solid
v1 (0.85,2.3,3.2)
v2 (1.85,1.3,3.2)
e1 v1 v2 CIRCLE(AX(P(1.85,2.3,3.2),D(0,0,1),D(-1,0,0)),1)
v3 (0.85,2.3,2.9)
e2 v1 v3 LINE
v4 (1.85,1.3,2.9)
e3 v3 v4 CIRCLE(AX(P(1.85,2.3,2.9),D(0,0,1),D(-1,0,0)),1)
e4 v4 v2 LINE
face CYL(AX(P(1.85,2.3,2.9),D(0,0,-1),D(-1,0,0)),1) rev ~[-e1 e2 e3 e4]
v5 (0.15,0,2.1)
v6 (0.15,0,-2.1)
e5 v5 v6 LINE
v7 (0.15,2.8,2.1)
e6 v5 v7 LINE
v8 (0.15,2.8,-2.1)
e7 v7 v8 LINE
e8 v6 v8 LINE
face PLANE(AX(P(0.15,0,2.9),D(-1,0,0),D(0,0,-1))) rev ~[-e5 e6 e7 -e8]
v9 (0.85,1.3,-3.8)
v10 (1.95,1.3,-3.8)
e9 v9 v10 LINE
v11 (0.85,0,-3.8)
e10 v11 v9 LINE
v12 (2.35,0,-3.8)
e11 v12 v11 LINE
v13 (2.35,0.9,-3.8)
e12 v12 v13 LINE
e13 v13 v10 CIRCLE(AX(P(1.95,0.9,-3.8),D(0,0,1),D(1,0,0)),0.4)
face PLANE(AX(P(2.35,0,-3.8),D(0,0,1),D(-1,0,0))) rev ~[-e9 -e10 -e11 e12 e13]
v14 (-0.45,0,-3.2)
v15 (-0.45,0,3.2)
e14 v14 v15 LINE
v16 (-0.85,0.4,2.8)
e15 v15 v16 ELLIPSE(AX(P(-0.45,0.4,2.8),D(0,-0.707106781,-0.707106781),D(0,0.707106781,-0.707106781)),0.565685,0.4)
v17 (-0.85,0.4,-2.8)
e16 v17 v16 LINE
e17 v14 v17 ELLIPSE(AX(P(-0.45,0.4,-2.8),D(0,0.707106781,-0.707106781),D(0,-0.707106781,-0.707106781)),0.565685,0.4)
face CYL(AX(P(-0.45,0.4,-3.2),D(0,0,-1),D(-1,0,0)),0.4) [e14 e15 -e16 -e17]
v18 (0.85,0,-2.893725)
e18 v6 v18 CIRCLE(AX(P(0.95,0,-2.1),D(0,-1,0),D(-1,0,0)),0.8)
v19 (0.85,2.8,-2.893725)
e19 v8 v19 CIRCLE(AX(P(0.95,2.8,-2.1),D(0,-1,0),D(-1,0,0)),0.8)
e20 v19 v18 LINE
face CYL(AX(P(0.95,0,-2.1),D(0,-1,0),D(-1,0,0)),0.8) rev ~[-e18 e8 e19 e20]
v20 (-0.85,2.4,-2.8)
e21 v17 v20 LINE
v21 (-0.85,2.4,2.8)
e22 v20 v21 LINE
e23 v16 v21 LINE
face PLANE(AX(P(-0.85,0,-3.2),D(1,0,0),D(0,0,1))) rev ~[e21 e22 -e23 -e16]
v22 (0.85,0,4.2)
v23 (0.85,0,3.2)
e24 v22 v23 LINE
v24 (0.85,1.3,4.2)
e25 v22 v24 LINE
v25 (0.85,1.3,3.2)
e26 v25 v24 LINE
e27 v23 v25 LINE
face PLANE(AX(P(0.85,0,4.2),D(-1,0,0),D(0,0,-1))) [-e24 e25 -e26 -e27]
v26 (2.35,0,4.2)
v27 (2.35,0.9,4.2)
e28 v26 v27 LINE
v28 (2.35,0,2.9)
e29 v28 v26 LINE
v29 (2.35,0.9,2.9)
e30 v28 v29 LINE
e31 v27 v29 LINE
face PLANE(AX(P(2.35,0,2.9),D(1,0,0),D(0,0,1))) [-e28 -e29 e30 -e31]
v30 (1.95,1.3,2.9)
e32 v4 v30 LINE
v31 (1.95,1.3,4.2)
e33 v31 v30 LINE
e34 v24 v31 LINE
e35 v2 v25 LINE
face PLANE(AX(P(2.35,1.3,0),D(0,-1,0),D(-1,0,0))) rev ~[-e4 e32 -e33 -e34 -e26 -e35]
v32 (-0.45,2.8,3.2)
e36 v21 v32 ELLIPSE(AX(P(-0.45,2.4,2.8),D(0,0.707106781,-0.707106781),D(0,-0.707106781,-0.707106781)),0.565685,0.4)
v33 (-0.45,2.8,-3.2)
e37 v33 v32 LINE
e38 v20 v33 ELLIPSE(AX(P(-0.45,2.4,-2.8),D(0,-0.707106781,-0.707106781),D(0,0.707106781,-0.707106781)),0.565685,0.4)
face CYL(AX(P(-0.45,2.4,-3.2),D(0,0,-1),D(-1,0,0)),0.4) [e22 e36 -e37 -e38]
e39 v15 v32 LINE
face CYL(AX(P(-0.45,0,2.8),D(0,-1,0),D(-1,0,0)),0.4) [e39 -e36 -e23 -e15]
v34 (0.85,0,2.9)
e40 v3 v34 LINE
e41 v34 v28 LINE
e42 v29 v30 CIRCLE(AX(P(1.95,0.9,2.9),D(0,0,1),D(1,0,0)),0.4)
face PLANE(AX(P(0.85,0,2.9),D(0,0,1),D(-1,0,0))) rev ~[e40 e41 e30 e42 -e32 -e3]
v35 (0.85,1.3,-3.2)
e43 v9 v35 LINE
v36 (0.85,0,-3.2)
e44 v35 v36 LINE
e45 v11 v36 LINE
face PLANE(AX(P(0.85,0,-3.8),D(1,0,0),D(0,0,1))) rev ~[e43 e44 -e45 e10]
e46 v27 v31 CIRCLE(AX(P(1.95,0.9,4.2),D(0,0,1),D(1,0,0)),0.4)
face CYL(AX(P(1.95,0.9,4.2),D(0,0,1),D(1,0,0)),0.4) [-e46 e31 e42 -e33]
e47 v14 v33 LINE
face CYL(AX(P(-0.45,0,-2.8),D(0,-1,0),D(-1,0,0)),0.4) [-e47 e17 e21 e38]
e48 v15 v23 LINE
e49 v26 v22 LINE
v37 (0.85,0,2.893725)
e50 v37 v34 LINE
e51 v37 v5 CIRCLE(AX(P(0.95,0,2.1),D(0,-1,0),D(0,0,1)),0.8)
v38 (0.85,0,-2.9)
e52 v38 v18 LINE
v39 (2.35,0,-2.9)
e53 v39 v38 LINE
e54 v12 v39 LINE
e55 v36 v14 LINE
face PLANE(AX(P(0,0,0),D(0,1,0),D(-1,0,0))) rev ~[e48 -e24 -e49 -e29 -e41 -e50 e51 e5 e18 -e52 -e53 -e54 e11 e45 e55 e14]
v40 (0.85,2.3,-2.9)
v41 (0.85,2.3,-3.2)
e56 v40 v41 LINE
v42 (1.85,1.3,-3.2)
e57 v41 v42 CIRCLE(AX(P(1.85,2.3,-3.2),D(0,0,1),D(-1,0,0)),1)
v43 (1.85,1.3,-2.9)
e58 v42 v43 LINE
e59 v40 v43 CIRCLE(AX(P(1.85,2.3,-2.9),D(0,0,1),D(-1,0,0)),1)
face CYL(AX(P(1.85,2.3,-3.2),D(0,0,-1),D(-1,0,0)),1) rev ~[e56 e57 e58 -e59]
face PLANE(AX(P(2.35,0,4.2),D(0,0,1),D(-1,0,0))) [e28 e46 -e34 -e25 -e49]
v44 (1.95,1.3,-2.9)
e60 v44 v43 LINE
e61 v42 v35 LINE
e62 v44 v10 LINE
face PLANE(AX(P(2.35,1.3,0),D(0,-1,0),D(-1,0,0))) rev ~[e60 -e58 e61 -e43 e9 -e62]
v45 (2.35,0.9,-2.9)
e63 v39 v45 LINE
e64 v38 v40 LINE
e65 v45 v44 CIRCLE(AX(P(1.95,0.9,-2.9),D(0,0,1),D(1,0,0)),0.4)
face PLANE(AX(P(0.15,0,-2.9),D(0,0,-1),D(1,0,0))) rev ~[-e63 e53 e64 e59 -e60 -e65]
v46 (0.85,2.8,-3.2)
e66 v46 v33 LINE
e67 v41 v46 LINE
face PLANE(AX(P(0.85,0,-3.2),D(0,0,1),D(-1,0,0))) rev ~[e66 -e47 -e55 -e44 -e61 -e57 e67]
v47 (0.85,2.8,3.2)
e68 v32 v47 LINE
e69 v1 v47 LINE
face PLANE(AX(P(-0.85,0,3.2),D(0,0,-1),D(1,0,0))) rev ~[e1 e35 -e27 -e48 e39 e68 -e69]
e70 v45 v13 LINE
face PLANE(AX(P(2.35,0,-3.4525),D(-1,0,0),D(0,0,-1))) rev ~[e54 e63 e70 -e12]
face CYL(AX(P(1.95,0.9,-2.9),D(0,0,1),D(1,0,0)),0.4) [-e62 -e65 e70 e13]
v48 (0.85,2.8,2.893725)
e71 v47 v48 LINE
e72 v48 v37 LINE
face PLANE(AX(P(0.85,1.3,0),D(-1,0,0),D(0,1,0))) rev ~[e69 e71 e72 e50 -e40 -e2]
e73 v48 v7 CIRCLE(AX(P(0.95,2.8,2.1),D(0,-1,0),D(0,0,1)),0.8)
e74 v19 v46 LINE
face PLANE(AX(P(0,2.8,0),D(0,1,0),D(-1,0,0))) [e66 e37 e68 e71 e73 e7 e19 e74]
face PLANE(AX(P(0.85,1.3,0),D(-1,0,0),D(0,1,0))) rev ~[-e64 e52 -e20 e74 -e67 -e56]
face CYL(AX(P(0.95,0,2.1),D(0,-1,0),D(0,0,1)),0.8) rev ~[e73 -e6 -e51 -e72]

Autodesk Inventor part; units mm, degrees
ref_plane "YZ Plane" through (0, 0, 0) normal (1, 0, 0) x (0, 1, 0)
ref_plane "XZ Plane" through (0, 0, 0) normal (0, 1, 0) x (-1, 0, 0)
ref_plane "XY Plane" through (0, 0, 0) normal (0, 0, 1) x (1, 0, 0)
sketch "Sketch1" plane through (0, 0, 0) normal (0, 1, 0) x (-1, 0, 0)
  line L0 (0.85, 3.2) -> (-0.85, 3.2)
  line L1 (-0.85, 3.2) -> (-0.85, -3.2)
  line L2 (-0.85, -3.2) -> (0.85, -3.2)
  line L3 (0.85, -3.2) -> (0.85, 3.2)
  line L4 (0.85, 3.2) -> (-0.85, -3.2) construction
  line L5 (-0.85, 3.2) -> (0.85, -3.2) construction
  line L6 (-0.85, -1.3) -> (-2.35, -1.3) construction
  line L7 (-2.35, -1.3) -> (-2.35, -3.4525)
  line L8 (-0.85, -3.2) -> (-0.85, -1.3)
  line L9 (-2.35, -3.4525) -> (-2.35, -3.8)
  line L10 (-2.35, -3.8) -> (-0.85, -3.8)
  line L11 (-0.85, -3.8) -> (-0.85, -3.2)
  line L12 (-2.35, -2.9) -> (-0.85, -2.9)
  line L13 (0, 0) -> (-4.1965, 0) construction
  line L14 (-2.35, 1.3) -> (-2.35, 3.4525)
  line L15 (-2.35, 2.9) -> (-0.85, 2.9)
  line L16 (-0.85, 2.9) -> (-2.35, 2.9)
  line L17 (-2.35, 2.9) -> (-2.35, 4.2)
  line L18 (-2.35, 4.2) -> (-0.85, 4.2)
  line L19 (-0.85, 4.2) -> (-0.85, 2.9)
  line L20 (-0.85, 2.9) -> (-0.15, 2.9)
  line L21 (-0.15, 2.9) -> (-0.15, -2.9)
  line L22 (-0.15, -2.9) -> (-0.85, -2.9)
  line L23 (-0.85, -2.9) -> (-0.85, 2.9)
  point P0 (-0.85, 2.9)
  point P1 (-0.85, -2.9)
  point P2 (-2.35, 3.4525)
  point P3 (-0.85, 2.9)
  point P4 (-0.85, -2.9)
  dimension "d0" = 1.3
  dimension "d2" = 1.7
  dimension "d3" = 1.5
  dimension "d5" = 1.9
  dimension "d7" = 2.9
  dimension "d13" = 1
  dimension "d14" = 2.5
  dimension "d18" = 0.7
extrude "Extrusion1" add sketch "Sketch1" along normal blind 2.8 contours L3 L2 L1 L22 L21 L20 L0 | L1 L15 L14 L17 L18 L19 | L11 L10 L9 L7 L12 L1
sketch "Sketch2" plane through (0, 0, 0) normal (0, 0, 1) x (1, 0, 0)
  line L0 (0.85, 2.8) -> (2.35, 2.8)
  line L1 (2.35, 2.8) -> (2.35, 1.3)
  line L2 (2.35, 1.3) -> (0.85, 1.3)
  line L3 (0.85, 1.3) -> (0.85, 2.8)
  line L4 (2.35, 0) -> (2.35, 2.8) projected
  line L5 (0.85, 0) -> (0.85, 2.8) projected
  line L6 (0.85, 2.8) -> (2.35, 2.8) projected
  dimension "d15" = 1.5
extrude "Extrusion2" cut sketch "Sketch2" along normal through all both and the other way through all
fillet "Fillet1" radius 0.8 2 edges at (0.15, 1.4, -2.9) (0.15, 1.4, 2.9)
fillet "Fillet1" radius 1 2 edges at (0.85, 1.3, 3.05) (0.85, 1.3, -3.05)
fillet "Fillet1" radius 0.4 2 edges at (2.35, 1.3, 3.55) (2.35, 1.3, -3.35)
fillet "Fillet1" radius 0.4 4 edges at (-0.85, 2.8, 0) (-0.85, 0, 0) (-0.85, 1.4, -3.2) (-0.85, 1.4, 3.2)
equation "\"button_height\" = 1.3"
properties part number "Button"
